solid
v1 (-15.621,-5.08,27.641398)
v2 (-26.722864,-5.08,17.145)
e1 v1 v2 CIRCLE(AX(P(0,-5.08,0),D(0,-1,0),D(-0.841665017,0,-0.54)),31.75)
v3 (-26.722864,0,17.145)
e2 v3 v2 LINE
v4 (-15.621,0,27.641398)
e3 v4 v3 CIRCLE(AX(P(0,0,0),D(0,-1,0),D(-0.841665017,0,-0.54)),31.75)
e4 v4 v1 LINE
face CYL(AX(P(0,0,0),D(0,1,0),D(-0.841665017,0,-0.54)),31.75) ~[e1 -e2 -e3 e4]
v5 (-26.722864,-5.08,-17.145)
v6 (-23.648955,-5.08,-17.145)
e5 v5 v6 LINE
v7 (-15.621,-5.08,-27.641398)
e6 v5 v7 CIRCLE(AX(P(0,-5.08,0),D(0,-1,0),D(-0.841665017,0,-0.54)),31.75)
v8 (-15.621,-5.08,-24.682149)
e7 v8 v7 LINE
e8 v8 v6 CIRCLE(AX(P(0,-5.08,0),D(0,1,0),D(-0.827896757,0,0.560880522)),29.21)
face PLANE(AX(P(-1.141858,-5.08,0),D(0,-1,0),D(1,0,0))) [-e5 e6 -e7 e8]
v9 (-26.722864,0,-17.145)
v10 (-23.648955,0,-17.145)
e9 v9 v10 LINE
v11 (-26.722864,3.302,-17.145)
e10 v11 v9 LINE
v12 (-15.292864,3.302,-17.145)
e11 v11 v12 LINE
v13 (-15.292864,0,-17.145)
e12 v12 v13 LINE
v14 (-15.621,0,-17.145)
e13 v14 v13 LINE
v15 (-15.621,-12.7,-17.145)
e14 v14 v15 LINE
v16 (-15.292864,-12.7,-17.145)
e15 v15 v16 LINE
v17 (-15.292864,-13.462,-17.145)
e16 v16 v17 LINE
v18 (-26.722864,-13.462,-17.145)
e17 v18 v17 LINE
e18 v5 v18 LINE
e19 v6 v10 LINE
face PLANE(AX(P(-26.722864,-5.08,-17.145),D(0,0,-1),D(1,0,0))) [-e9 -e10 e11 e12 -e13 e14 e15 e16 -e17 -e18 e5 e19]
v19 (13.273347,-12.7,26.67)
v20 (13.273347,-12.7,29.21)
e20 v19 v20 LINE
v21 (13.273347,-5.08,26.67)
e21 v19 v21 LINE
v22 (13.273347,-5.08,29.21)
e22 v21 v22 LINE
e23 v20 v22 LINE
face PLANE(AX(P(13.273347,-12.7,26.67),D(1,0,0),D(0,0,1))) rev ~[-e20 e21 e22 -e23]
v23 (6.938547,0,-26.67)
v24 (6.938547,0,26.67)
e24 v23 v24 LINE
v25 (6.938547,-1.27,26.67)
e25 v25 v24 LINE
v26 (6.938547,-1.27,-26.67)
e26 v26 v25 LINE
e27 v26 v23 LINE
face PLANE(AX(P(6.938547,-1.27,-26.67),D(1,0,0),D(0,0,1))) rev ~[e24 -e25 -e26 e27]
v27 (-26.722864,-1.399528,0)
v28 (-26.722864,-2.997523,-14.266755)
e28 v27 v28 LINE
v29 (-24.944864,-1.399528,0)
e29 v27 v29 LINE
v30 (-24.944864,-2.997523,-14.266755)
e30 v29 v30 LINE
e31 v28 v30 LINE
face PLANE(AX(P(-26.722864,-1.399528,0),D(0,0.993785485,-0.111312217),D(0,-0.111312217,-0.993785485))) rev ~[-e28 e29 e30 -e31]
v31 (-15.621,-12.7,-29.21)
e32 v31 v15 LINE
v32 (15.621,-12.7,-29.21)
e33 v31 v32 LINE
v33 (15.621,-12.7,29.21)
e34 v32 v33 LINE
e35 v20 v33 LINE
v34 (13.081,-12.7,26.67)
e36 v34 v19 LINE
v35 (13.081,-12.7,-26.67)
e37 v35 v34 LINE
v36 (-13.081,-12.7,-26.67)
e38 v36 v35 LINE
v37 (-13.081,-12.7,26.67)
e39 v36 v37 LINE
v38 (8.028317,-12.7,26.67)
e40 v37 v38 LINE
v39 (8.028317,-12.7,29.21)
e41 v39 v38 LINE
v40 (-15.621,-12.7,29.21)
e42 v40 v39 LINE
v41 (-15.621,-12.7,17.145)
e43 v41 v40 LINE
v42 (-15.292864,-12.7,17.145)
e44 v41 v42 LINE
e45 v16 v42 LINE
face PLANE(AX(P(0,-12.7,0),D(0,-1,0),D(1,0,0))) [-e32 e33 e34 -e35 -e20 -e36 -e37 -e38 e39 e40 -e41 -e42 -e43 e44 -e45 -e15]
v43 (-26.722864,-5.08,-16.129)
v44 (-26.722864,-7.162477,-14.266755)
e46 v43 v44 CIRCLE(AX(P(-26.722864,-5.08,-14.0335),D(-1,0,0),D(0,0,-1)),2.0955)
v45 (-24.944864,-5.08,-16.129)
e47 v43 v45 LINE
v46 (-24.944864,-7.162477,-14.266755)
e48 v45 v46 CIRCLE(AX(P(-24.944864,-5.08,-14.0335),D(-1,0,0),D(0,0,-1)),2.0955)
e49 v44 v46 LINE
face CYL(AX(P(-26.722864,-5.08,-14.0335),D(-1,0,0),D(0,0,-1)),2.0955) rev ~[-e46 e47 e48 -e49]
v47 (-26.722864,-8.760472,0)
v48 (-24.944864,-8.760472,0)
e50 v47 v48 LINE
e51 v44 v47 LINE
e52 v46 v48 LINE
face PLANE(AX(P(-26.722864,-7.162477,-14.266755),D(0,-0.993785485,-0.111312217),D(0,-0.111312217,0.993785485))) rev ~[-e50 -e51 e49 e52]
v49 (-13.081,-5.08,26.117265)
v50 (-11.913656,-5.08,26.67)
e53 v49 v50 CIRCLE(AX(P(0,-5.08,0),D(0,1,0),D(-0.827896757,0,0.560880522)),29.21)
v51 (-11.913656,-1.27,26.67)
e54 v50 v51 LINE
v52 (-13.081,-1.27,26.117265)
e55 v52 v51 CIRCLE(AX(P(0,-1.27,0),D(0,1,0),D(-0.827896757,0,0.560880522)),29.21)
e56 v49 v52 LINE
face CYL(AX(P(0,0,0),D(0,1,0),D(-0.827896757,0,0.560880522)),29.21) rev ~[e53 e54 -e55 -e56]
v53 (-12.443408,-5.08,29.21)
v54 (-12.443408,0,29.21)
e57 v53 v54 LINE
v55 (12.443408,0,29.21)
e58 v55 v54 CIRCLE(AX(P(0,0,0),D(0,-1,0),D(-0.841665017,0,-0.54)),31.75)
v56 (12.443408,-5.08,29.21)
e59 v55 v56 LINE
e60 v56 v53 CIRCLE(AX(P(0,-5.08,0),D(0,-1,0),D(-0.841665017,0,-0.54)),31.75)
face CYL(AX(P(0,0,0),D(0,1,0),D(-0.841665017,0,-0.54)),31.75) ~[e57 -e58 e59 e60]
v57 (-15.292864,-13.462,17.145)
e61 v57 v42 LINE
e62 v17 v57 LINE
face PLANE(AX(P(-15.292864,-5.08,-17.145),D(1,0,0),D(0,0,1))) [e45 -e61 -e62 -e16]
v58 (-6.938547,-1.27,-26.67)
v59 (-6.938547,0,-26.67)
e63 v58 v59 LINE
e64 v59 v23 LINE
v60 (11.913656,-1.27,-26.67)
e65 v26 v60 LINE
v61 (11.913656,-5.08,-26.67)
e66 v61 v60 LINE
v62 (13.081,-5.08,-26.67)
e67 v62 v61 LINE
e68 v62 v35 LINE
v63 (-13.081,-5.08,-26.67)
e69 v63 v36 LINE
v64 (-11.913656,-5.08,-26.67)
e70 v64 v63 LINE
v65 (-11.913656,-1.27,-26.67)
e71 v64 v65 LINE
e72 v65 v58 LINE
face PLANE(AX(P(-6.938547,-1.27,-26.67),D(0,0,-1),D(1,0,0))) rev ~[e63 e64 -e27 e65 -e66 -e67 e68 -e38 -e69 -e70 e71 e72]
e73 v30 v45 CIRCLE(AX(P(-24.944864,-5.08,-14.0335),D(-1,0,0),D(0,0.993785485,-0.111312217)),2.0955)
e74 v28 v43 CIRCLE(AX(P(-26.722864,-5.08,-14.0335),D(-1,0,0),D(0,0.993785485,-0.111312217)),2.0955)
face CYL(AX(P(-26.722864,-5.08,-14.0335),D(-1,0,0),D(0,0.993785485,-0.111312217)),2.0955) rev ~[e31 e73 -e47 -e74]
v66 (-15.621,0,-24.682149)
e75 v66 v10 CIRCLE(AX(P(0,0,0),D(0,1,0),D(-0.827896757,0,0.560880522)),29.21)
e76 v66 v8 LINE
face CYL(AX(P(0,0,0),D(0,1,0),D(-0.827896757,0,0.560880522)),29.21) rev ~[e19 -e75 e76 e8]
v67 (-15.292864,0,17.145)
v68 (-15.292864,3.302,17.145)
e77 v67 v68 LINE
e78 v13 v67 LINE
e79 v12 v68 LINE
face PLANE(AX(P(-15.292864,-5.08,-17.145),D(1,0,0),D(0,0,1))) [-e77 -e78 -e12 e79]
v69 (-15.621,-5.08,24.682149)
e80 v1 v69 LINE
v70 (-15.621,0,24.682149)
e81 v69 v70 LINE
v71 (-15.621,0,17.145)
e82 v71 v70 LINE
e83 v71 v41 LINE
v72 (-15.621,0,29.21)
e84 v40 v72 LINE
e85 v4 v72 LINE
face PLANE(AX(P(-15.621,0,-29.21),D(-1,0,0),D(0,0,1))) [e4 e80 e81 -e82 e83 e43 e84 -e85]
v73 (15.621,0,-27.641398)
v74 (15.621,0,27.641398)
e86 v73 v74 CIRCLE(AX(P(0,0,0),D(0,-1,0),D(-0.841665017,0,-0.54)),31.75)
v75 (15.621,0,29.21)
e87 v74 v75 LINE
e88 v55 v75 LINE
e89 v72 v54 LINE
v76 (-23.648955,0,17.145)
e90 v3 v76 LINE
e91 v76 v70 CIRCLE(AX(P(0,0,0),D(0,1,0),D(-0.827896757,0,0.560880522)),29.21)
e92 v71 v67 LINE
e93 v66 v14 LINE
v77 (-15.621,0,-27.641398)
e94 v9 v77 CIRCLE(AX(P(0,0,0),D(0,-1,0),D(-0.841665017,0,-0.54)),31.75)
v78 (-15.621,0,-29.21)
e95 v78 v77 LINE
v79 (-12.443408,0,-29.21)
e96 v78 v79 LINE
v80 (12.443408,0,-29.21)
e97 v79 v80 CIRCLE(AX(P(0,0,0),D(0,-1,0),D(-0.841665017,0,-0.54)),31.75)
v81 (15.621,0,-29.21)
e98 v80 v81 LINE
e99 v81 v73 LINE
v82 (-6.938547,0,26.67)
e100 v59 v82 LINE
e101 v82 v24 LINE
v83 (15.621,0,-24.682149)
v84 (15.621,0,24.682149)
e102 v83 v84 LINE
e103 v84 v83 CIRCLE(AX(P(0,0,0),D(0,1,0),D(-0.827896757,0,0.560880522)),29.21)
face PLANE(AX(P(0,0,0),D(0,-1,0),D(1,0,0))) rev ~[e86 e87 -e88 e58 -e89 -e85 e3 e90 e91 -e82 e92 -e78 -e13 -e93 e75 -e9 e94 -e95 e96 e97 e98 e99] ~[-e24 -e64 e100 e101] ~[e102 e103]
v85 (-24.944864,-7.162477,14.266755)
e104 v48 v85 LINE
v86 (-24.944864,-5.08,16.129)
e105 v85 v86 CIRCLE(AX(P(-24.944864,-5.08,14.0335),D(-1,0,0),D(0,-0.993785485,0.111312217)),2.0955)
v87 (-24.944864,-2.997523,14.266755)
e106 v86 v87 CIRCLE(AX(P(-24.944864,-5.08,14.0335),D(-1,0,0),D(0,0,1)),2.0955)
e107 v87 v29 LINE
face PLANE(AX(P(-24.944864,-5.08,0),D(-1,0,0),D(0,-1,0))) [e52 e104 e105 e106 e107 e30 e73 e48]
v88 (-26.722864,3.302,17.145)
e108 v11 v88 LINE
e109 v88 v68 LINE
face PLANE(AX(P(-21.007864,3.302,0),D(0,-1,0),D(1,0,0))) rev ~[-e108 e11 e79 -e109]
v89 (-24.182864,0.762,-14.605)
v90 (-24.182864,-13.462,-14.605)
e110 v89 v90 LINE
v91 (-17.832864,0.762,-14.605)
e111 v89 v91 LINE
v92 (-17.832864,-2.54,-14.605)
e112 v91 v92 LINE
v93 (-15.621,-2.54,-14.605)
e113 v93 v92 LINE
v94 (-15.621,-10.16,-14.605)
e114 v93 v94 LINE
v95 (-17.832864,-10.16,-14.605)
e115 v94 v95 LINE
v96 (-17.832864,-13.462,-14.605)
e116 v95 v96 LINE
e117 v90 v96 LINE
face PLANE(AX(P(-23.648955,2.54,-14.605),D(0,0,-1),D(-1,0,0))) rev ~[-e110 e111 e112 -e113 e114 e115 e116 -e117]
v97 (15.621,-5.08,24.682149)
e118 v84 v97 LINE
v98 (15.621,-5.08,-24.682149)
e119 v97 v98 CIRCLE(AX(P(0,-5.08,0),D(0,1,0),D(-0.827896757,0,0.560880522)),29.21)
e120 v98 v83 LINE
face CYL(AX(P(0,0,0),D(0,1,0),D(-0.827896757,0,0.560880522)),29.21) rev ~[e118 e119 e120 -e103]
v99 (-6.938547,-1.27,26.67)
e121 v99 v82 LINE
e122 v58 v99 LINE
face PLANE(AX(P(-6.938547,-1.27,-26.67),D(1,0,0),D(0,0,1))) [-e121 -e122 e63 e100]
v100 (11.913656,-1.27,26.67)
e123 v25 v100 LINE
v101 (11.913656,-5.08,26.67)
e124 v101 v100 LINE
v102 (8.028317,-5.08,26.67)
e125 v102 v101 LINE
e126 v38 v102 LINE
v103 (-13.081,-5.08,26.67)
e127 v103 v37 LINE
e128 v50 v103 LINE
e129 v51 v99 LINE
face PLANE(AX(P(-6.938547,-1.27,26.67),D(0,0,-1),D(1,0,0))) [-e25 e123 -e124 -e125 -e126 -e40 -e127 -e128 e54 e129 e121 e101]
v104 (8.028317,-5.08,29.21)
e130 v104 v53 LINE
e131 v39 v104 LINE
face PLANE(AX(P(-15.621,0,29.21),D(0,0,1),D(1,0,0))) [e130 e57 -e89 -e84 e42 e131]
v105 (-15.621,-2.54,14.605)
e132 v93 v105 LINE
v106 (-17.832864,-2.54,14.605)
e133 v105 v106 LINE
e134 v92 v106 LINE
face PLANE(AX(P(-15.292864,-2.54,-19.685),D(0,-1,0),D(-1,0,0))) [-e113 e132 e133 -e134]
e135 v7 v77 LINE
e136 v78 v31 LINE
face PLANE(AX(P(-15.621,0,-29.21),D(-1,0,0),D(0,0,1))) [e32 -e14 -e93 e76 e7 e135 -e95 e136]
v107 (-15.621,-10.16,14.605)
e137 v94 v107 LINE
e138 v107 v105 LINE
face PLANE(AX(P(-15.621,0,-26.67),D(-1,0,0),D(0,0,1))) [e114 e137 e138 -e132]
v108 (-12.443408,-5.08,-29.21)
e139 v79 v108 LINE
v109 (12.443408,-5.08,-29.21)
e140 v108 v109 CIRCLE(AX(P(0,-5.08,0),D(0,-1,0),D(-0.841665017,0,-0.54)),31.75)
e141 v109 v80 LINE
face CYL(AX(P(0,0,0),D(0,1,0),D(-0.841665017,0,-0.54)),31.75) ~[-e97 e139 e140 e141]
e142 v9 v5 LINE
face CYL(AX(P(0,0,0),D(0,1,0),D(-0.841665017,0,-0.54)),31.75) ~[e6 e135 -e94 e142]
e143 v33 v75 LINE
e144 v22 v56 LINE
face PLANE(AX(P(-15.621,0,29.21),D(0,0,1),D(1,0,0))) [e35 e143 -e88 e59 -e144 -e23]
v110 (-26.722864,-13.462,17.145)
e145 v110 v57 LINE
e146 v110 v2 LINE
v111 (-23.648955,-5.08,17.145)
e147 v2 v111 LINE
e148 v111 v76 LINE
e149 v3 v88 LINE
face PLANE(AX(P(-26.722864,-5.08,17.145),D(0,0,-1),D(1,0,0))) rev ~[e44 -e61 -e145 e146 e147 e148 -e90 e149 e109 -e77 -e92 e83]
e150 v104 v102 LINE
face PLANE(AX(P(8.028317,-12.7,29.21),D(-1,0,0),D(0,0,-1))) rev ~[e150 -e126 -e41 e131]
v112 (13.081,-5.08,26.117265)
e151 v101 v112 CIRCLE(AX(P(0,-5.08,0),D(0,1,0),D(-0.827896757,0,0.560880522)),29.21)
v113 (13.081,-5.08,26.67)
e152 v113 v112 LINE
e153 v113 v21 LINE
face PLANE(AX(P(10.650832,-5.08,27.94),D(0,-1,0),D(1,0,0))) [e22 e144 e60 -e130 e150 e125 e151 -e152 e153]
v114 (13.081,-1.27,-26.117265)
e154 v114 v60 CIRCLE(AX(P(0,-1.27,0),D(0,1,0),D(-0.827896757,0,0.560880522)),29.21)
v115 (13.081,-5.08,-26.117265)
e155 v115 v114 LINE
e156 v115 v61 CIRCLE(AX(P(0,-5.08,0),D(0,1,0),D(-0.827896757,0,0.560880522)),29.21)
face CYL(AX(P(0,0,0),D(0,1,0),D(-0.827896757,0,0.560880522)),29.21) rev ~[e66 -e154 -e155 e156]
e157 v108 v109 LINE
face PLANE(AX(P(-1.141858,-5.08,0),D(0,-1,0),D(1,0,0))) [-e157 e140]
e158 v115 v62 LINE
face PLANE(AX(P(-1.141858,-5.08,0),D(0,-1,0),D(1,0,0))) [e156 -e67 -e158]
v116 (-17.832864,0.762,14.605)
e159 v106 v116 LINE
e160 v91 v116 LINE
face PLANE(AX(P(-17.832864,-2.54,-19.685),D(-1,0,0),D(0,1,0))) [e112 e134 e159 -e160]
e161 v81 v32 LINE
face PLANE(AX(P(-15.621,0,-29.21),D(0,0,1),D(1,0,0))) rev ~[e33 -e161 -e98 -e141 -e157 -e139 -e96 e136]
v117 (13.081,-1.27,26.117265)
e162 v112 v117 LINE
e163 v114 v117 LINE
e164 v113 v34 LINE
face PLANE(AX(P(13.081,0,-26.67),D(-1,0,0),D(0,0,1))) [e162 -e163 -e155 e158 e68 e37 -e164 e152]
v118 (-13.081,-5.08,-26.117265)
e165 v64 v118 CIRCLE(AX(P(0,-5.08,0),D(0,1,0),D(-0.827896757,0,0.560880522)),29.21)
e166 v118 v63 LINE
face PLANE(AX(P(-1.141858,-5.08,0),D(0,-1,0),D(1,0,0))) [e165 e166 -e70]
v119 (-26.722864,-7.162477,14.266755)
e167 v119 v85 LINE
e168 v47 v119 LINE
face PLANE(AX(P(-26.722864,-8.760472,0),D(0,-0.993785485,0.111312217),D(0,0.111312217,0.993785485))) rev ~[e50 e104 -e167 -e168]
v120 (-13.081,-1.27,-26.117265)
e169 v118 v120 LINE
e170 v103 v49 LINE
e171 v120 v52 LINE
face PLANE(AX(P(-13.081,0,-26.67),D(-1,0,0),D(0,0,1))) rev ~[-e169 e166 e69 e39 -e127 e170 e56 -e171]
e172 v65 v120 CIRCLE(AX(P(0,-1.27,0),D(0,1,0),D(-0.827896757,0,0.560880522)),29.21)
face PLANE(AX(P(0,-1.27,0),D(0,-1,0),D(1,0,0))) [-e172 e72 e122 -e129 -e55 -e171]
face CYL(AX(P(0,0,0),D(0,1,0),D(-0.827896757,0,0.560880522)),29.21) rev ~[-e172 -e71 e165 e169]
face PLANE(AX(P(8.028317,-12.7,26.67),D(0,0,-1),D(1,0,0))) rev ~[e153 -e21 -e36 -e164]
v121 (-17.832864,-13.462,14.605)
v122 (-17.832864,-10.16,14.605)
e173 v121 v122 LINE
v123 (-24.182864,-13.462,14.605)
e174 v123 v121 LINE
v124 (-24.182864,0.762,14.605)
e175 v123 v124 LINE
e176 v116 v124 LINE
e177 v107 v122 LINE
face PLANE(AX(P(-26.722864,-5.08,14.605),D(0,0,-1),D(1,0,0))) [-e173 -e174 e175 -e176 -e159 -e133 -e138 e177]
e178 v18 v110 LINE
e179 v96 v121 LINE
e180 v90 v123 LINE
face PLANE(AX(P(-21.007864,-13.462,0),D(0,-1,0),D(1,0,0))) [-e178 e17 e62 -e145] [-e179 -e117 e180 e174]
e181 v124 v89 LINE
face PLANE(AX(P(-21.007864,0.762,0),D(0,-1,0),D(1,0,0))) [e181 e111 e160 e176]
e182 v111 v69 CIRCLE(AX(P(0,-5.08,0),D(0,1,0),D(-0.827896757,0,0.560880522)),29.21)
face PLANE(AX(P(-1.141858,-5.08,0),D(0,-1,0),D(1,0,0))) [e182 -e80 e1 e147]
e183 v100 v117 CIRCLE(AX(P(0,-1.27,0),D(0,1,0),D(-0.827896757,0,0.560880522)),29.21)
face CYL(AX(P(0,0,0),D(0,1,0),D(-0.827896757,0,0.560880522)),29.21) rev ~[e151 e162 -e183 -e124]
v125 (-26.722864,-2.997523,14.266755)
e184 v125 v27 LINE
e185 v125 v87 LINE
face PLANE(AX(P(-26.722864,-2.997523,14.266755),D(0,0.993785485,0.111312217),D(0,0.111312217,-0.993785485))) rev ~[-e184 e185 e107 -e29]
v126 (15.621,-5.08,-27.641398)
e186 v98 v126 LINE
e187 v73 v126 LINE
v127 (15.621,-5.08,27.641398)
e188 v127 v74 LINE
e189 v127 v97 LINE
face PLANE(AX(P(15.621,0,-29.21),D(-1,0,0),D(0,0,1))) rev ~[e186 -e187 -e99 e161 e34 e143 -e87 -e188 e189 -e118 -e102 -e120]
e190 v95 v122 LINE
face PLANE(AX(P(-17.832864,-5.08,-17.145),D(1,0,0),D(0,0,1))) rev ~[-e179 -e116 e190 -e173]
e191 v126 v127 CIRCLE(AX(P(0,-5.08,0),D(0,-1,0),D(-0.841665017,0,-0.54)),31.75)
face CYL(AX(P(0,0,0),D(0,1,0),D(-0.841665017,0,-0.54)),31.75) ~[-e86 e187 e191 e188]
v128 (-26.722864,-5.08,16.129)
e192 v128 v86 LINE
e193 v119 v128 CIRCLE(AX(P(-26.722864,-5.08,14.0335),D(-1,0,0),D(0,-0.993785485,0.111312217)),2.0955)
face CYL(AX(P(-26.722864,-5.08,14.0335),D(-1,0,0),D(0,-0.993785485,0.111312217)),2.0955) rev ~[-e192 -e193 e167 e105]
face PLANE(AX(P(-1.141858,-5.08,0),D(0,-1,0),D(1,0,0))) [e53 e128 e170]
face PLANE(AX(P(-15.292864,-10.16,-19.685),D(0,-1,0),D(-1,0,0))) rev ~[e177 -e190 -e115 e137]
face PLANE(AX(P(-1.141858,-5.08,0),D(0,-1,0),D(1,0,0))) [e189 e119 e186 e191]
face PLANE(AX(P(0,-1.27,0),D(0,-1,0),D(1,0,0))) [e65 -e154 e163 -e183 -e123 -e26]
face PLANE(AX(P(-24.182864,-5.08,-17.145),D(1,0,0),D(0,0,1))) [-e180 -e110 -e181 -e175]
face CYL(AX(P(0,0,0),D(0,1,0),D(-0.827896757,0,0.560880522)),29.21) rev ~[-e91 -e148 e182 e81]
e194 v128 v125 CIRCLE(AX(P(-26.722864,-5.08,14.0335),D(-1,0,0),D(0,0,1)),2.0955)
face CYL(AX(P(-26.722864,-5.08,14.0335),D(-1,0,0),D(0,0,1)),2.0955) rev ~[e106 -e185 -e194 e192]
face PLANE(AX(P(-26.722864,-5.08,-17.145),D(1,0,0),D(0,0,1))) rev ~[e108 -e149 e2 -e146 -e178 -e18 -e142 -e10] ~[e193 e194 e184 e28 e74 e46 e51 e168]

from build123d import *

# Parameters (mm, degrees)
F1_DEPTH      = 5.08
F2_W          = 31.242
F2_H          = 58.42
F2_W_2        = 26.162
F2_H_2        = 53.34
F3_DEPTH      = 12.7
F6_W          = 31.242
F6_H          = 58.42
F7_DEPTH      = 1.27
F8_W          = 11.43
F8_H          = 34.29
F9_DEPTH      = 8.382
F10_T         = 2.54
F10_T3_DEPTH  = 10.16
F10_T5_DEPTH  = 8.153909223
F10_T7_DEPTH  = 5.4081357261
F10_T9_DEPTH  = 39.37
F10_T11_DEPTH = 8.0392489691
F10_T13_DEPTH = 17.78
F10_T15_DEPTH = 8.0392489691
F10_T17_DEPTH = 29.9668157867
F10_T19_DEPTH = 8.89
F10_T21_DEPTH = 28.9073120599
F10_T23_DEPTH = 6.24734397
F10_T25_DEPTH = 12.7
F10_T27_DEPTH = 6.24734397
F10_T29_DEPTH = 57.3145303032
F10_T31_DEPTH = 5.6327348484
F10_T33_DEPTH = 5.6327348484
F10_T36_ANGLE = 2.5336786408
F10_T38_ANGLE = 2.5336786408
F10_T40_ANGLE = 2.5336786408
F10_T42_ANGLE = 2.5336786408
F11_W         = 13.877093792
F11_H         = 53.34
F12_DEPTH     = 25.4
F14_DEPTH     = 7.62
F16_DEPTH     = 1.778


# Not quite as in the source:
# - a feature of the source that left no trace in its solid (it failed there, or was rolled back) is left out
# - a shell that OpenCascade refuses in one call is made with other operations: the cavity is built on its own and cut out


with BuildPart() as f1:
    # F0 (on Front) → F1 (new body)
    with BuildSketch(Plane.XZ):
        with BuildLine():
            Line((-26.7228642739, 17.145), (-26.7228642739, -17.145))
            ThreePointArc((-26.7228642739, -17.145), (31.75, 0), (-26.7228642739, 17.145))
        make_face()
        with BuildLine():
            ThreePointArc((-24.1828642739, 16.3833200393), (29.21, 0), (-24.1828642739, -16.3833200393))
            Line((-24.1828642739, -16.3833200393), (-24.1828642739, 16.3833200393))
        make_face(mode=Mode.SUBTRACT)
    extrude(amount=F1_DEPTH)

    # F2 (on Front) → F3 (join)
    with BuildSketch(Plane.XZ):
        Rectangle(F2_W, F2_H)
        Rectangle(F2_W_2, F2_H_2, mode=Mode.SUBTRACT)
    extrude(amount=F3_DEPTH)

    # F6 (on Front) → F7 (join)
    with BuildSketch(Plane.XZ):
        Rectangle(F6_W, F6_H)
    extrude(amount=F7_DEPTH)

    # F8 (on face) → F9 (join, symmetric)
    with BuildSketch(Plane.XZ.offset(5.08)):
        with Locations((-21.0078642739, 0)):
            Rectangle(F8_W, F8_H)
    extrude(amount=F9_DEPTH, both=True)

    # F10: shell of thickness 2.54, made by hand


with BuildPart() as f10_core1:
    # F10_t2: copy of F1
    add(f1.part)

    # the walls: a layer under each face that stays
    f10_faces = [f10_core1.faces().sort_by_distance(p)[0] for p in [
        (-26.7228642739, -5.08, 0),
        (-21.8127096171, -2.54, 23.0709384109),
        (-21.8127096171, -2.54, -23.0709384109),
        (2.5135678631, 0, 0),
        (-15.621, -6.35, 23.1775),
        (-21.1719321369, -5.08, 22.3931987794),
        (-21.1719321369, -5.08, -22.3931987794),
        (-15.621, -6.35, -23.1775),
        (-21.0078642739, -5.08, 17.145),
        (-21.0078642739, -5.08, -17.145),
        (-21.0078642739, 3.302, 0),
        (0, -6.35, 29.21),
        (0, -2.54, 31.75),
        (15.621, -6.35, 0),
        (31.75, -2.54, 0),
        (0, -6.35, -29.21),
        (0, -2.54, -31.75),
        (-19.9933612642, -2.54, -21.2952953809),
        (-15.2928642739, 1.651, 0),
        (-19.9933612642, -2.54, 21.2952953809),
        (29.21, -2.54, 0),
        (-13.3894285714, -12.7, -25.0371428571),
        (-15.2928642739, -13.081, 0),
        (0, -5.08, 30.48),
        (23.6855, -5.08, -18.4275983725),
        (0, -5.08, -30.48),
        (0, -6.985, 26.67),
        (-13.081, -6.985, 0),
        (13.081, -6.985, 0),
        (0, -6.985, -26.67),
        (-12.5003834528, -3.175, 26.4000854834),
        (0, -1.27, 0),
        (12.5003834528, -3.175, 26.4000854834),
        (12.497328015, -5.08, 26.5778775253),
        (-12.8864426717, -5.08, 26.3936325758),
        (-12.5003834528, -3.175, -26.4000854834),
        (-12.8864426717, -5.08, -26.5778775253),
        (12.5003834528, -3.175, -26.4000854834),
        (12.497328015, -5.08, -26.5778775253),
    ]]
    thicken(f10_faces, amount=-F10_T, mode=Mode.SUBTRACT)

    # F10_s4 → F10_t3 (cut)
    with BuildSketch(Plane.XZ.offset(-2.54)):
        Polygon((-15.6588968, 27.6635106768), (-14.37132, 25.430085754), (-13.081, 26.1592850891), (-13.081, 27.6413975587), align=None)
        Polygon((-15.6588968, -27.6635106768), (-14.37132, -25.430085754), (-13.081, -26.1592850891), (-13.081, -27.6413975587), align=None)
        Polygon((-15.6328165217, 24.6606858517), (-13.081, 24.6821485896), (-13.081, 29.2956343073), (-16.9793478261, 26.82842238), align=None)
        Polygon((-15.6328165217, -24.6606858517), (-13.081, -24.6821485896), (-13.081, -29.2956343073), (-16.9793478261, -26.82842238), align=None)
        Polygon((-23.6283907422, 17.1554913043), (-23.6489550509, 14.605), (-28.62768243, 14.605), (-25.7053859249, 18.6358695652), align=None)
        Polygon((-23.6283907422, -17.1554913043), (-23.6489550509, -14.605), (-28.62768243, -14.605), (-25.7053859249, -18.6358695652), align=None)
        Polygon((12.4533626197, 29.258768), (12.4434078933, 26.67), (11.9249325645, 26.67), (11.4479352619, 26.8732), align=None)
        Polygon((-12.4533626197, 29.258768), (-12.4434078933, 26.67), (-11.9249325644, 26.67), (-11.4479352619, 26.8732), align=None)
        Polygon((15.6588968, 27.6635106768), (13.081, 27.6413975587), (13.081, 26.1592850891), (14.37132, 25.430085754), align=None)
        Polygon((15.6328165217, 24.6606858517), (13.081, 24.6821485896), (13.081, 29.2956343073), (16.9793478261, 26.82842238), align=None)
        Polygon((15.6328165217, -24.6606858517), (13.081, -24.6821485896), (13.081, -29.2956343073), (16.9793478261, -26.82842238), align=None)
        Polygon((15.6588968, -27.6635106768), (13.081, -27.6413975587), (13.081, -26.1592850891), (14.37132, -25.430085754), align=None)
        Polygon((-12.4533626197, -29.258768), (-12.4434078933, -26.67), (-11.9249325645, -26.67), (-11.4479352619, -26.8732), align=None)
        Polygon((12.4533626197, -29.258768), (12.4434078933, -26.67), (11.9249325644, -26.67), (11.4479352619, -26.8732), align=None)
    extrude(amount=F10_T3_DEPTH, mode=Mode.SUBTRACT)

    # F10_s6 → F10_t5 (cut)
    with BuildSketch(Plane.YZ.offset(-29.2628642739)):
        Polygon((0.0254, 17.1704), (-2.54, 17.145), (-2.54, 14.605), (0, 14.605), align=None)
        Polygon((0.0254, -17.1704), (-2.54, -17.145), (-2.54, -14.605), (0, -14.605), align=None)
        Polygon((-5.1054, 17.1704), (-2.54, 17.145), (-2.54, 14.605), (-5.08, 14.605), align=None)
        Polygon((-5.1054, -17.1704), (-2.54, -17.145), (-2.54, -14.605), (-5.08, -14.605), align=None)
    extrude(amount=F10_T5_DEPTH, mode=Mode.SUBTRACT)

    # F10_s8 → F10_t7 (cut)
    with BuildSketch(Plane.YZ.offset(-18.161)):
        Polygon((0.0254, -17.1704), (-2.54, -17.145), (-2.54, -14.605), (0, -14.605), align=None)
        Polygon((0.0254, 17.1704), (-2.54, 17.145), (-2.54, 14.605), (0, 14.605), align=None)
        Polygon((-12.7254, 17.1704), (-12.7, 14.605), (-10.16, 14.605), (-10.16, 17.145), align=None)
        Polygon((-12.7254, -17.1704), (-12.7, -14.605), (-10.16, -14.605), (-10.16, -17.145), align=None)
    extrude(amount=F10_T7_DEPTH, mode=Mode.SUBTRACT)

    # F10_s10 → F10_t9 (cut)
    with BuildSketch(Plane.XY.offset(-19.685)):
        Polygon((-15.2674642739, 0.0254), (-15.2928642739, -2.54), (-17.8328642739, -2.54), (-17.8328642739, 0), align=None)
        Polygon((-15.2674642739, -12.7254), (-15.2928642739, -10.16), (-17.8328642739, -10.16), (-17.8328642739, -12.7), align=None)
    extrude(amount=F10_T9_DEPTH, mode=Mode.SUBTRACT)

    # F10_s12 → F10_t11 (cut)
    with BuildSketch(Plane.XY.offset(22.1421485896)):
        Polygon((-15.6464, -5.1054), (-13.081, -5.08), (-13.081, -2.54), (-15.621, -2.54), align=None)
        Polygon((15.6464, -5.1054), (13.081, -5.08), (13.081, -2.54), (15.621, -2.54), align=None)
    extrude(amount=F10_T11_DEPTH, mode=Mode.SUBTRACT)

    # F10_s14 → F10_t13 (cut)
    with BuildSketch(Plane.XZ.offset(-2.54)):
        Polygon((-15.6464, 17.1704), (-13.081, 17.145), (-13.081, 14.605), (-15.621, 14.605), align=None)
        Polygon((-15.6464, -17.1704), (-13.081, -17.145), (-13.081, -14.605), (-15.621, -14.605), align=None)
    extrude(amount=F10_T13_DEPTH, mode=Mode.SUBTRACT)

    # F10_s16 → F10_t15 (cut)
    with BuildSketch(Plane.XY.offset(-30.1813975587)):
        Polygon((-15.6464, -5.1054), (-15.621, -2.54), (-13.081, -2.54), (-13.081, -5.08), align=None)
        Polygon((15.6464, -5.1054), (13.081, -5.08), (13.081, -2.54), (15.621, -2.54), align=None)
    extrude(amount=F10_T15_DEPTH, mode=Mode.SUBTRACT)

    # F10_s18 → F10_t17 (cut)
    with BuildSketch(Plane.YZ.offset(-14.9834078933)):
        Polygon((-5.1054, 29.2354), (-5.08, 26.67), (-2.54, 26.67), (-2.54, 29.21), align=None)
        Polygon((-5.1054, -29.2354), (-5.08, -26.67), (-2.54, -26.67), (-2.54, -29.21), align=None)
    extrude(amount=F10_T17_DEPTH, mode=Mode.SUBTRACT)

    # F10_s20 → F10_t19 (cut)
    with BuildSketch(Plane.XZ.offset(-1.27)):
        Polygon((-11.9032963291, 26.6214086957), (-11.91365603, 29.21), (-12.4551858495, 29.21), (-12.9496261195, 28.9891304348), align=None)
        Polygon((11.9032963291, 26.6214086957), (11.91365603, 29.21), (12.4551858495, 29.21), (12.9496261195, 28.9891304348), align=None)
        Polygon((-13.0442252174, -26.0945544863), (-15.621, -26.1172651516), (-15.621, -27.6858696652), (-14.2184782609, -28.3883316865), align=None)
        Polygon((-13.0442252174, 26.0945544863), (-15.621, 26.1172651516), (-15.621, 27.6858696652), (-14.2184782609, 28.3883316865), align=None)
        Polygon((13.0442252174, 26.0945544863), (15.621, 26.1172651516), (15.621, 27.6858696652), (14.2184782609, 28.3883316865), align=None)
        Polygon((13.0442252174, -26.0945544863), (15.621, -26.1172651516), (15.621, -27.6858696652), (14.2184782609, -28.3883316865), align=None)
        Polygon((11.9032963291, -26.6214086957), (11.91365603, -29.21), (12.4551858495, -29.21), (12.9496261195, -28.9891304348), align=None)
        Polygon((-11.9032963291, -26.6214086957), (-11.91365603, -29.21), (-12.4551858495, -29.21), (-12.9496261195, -28.9891304348), align=None)
    extrude(amount=F10_T19_DEPTH, mode=Mode.SUBTRACT)

    # F10_s22 → F10_t21 (cut)
    with BuildSketch(Plane.YZ.offset(-14.45365603)):
        Polygon((-1.2954, 26.6446), (-1.27, 29.21), (1.27, 29.21), (1.27, 26.67), align=None)
        Polygon((-1.2954, -26.6446), (-1.27, -29.21), (1.27, -29.21), (1.27, -26.67), align=None)
    extrude(amount=F10_T21_DEPTH, mode=Mode.SUBTRACT)

    # F10_s24 → F10_t23 (cut)
    with BuildSketch(Plane.YZ.offset(9.37365603)):
        Polygon((-5.1054, 26.6446), (-5.08, 29.21), (-2.54, 29.21), (-2.54, 26.67), align=None)
        Polygon((-5.1054, -26.6446), (-5.08, -29.21), (-2.54, -29.21), (-2.54, -26.67), align=None)
    extrude(amount=F10_T23_DEPTH, mode=Mode.SUBTRACT)

    # F10_s26 → F10_t25 (cut)
    with BuildSketch(Plane.XZ.offset(2.54)):
        Polygon((13.0556, 26.6446), (13.081, 29.21), (15.621, 29.21), (15.621, 26.67), align=None)
        Polygon((-13.0556, 26.6446), (-13.081, 29.21), (-15.621, 29.21), (-15.621, 26.67), align=None)
        Polygon((-13.0556, -26.6446), (-15.621, -26.67), (-15.621, -29.21), (-13.081, -29.21), align=None)
        Polygon((13.0556, -26.6446), (15.621, -26.67), (15.621, -29.21), (13.081, -29.21), align=None)
    extrude(amount=F10_T25_DEPTH, mode=Mode.SUBTRACT)

    # F10_s28 → F10_t27 (cut)
    with BuildSketch(Plane.YZ.offset(-15.621)):
        Polygon((-5.1054, 26.6446), (-5.08, 29.21), (-2.54, 29.21), (-2.54, 26.67), align=None)
        Polygon((-5.1054, -26.6446), (-5.08, -29.21), (-2.54, -29.21), (-2.54, -26.67), align=None)
    extrude(amount=F10_T27_DEPTH, mode=Mode.SUBTRACT)

    # F10_s30 → F10_t29 (cut)
    with BuildSketch(Plane.XY.offset(-28.6572651516)):
        Polygon((-13.0556, -1.2954), (-15.621, -1.27), (-15.621, 1.27), (-13.081, 1.27), align=None)
        Polygon((13.0556, -1.2954), (15.621, -1.27), (15.621, 1.27), (13.081, 1.27), align=None)
    extrude(amount=F10_T29_DEPTH, mode=Mode.SUBTRACT)

    # F10_s32 → F10_t31 (cut)
    with BuildSketch(Plane.XY.offset(23.5772651516)):
        Polygon((-13.0556, -5.1054), (-15.621, -5.08), (-15.621, -2.54), (-13.081, -2.54), align=None)
        Polygon((13.0556, -5.1054), (15.621, -5.08), (15.621, -2.54), (13.081, -2.54), align=None)
    extrude(amount=F10_T31_DEPTH, mode=Mode.SUBTRACT)

    # F10_s34 → F10_t33 (cut)
    with BuildSketch(Plane.XY.offset(-29.21)):
        Polygon((-13.0556, -5.1054), (-15.621, -5.08), (-15.621, -2.54), (-13.081, -2.54), align=None)
        Polygon((13.0556, -5.1054), (15.621, -5.08), (15.621, -2.54), (13.081, -2.54), align=None)
    extrude(amount=F10_T33_DEPTH, mode=Mode.SUBTRACT)

    # F10_s35 → F10_t36 (revolve, cut)
    with BuildSketch(Plane(origin=(0, 0, 0), x_dir=(0, 1, 0), z_dir=(-0.894120683, 0, -0.447826087))):
        Polygon((-1.2954, -29.1846), (-1.27, -31.75), (1.27, -31.75), (1.27, -29.21), align=None)
    revolve(axis=Axis((0, -1.27, 0), (0, 1, 0)), revolution_arc=F10_T36_ANGLE, mode=Mode.SUBTRACT)

    # F10_s37 → F10_t38 (revolve, cut)
    with BuildSketch(Plane(origin=(0, 0, 0), x_dir=(0, 1, 0), z_dir=(-0.9130434783, 0, 0.40786224))):
        Polygon((-1.2954, -29.1846), (1.27, -29.21), (1.27, -31.75), (-1.27, -31.75), align=None)
    revolve(axis=Axis((0, -1.27, 0), (0, 1, 0)), revolution_arc=F10_T38_ANGLE, mode=Mode.SUBTRACT)

    # F10_s39 → F10_t40 (revolve, cut)
    with BuildSketch(Plane(origin=(0, 0, 0), x_dir=(0, 1, 0), z_dir=(0.894120683, 0, 0.447826087))):
        Polygon((-1.2954, -29.1846), (1.27, -29.21), (1.27, -31.75), (-1.27, -31.75), align=None)
    revolve(axis=Axis((0, -1.27, 0), (0, 1, 0)), revolution_arc=F10_T40_ANGLE, mode=Mode.SUBTRACT)

    # F10_s41 → F10_t42 (revolve, cut)
    with BuildSketch(Plane(origin=(0, 0, 0), x_dir=(0, 1, 0), z_dir=(0.9130434783, 0, -0.40786224))):
        Polygon((-1.2954, -29.1846), (1.27, -29.21), (1.27, -31.75), (-1.27, -31.75), align=None)
    revolve(axis=Axis((0, -1.27, 0), (0, 1, 0)), revolution_arc=F10_T42_ANGLE, mode=Mode.SUBTRACT)


with BuildPart() as f1_1:
    add(f1.part)

    # what is left inside the walls is the cavity
    f10_cavity = [f10_core1.part.solids().sort_by_distance(p)[0] for p in [
        (-24.157464, -8.720667, 0),
    ]]
    add(f10_cavity, mode=Mode.SUBTRACT)

    # F11 (on face) → F12 (cut)
    with BuildSketch(Plane.XZ.offset(1.27)):
        Rectangle(F11_W, F11_H)
    extrude(amount=-F12_DEPTH, mode=Mode.SUBTRACT)

    # F13 (on face) → F14 (cut)
    with BuildSketch(Plane.XZ.offset(12.7)):
        Polygon((13.2733471692, 26.67), (13.2733471692, 29.21), (8.0283172429, 29.21), (8.0283172429, 26.67), (13.081, 26.67), align=None)
    extrude(amount=-F14_DEPTH, mode=Mode.SUBTRACT)

    # F15 (on face) → F16 (cut)
    with BuildSketch(Plane(origin=(-26.7228642739, 0, 0), x_dir=(0, -1, 0), z_dir=(-1, 0, 0))):
        with BuildLine():
            Line((8.7604723504, 0), (7.1624774839, 14.2667547511))
            ThreePointArc((7.1624774839, 14.2667547511), (6.4768419594, 15.5955348237), (5.08, 16.129))
            ThreePointArc((5.08, 16.129), (3.6831580406, 15.5955348237), (2.9975225161, 14.2667547511))
            Line((2.9975225161, 14.2667547511), (1.3995276496, 0))
            Line((1.3995276496, 0), (2.9975225161, -14.2667547511))
            ThreePointArc((2.9975225161, -14.2667547511), (3.6831580406, -15.5955348237), (5.08, -16.129))
            ThreePointArc((5.08, -16.129), (6.4768419594, -15.5955348237), (7.1624774839, -14.2667547511))
            Line((7.1624774839, -14.2667547511), (8.7604723504, 0))
        make_face()
    extrude(amount=-F16_DEPTH, mode=Mode.SUBTRACT)


solid = f1_1.part
